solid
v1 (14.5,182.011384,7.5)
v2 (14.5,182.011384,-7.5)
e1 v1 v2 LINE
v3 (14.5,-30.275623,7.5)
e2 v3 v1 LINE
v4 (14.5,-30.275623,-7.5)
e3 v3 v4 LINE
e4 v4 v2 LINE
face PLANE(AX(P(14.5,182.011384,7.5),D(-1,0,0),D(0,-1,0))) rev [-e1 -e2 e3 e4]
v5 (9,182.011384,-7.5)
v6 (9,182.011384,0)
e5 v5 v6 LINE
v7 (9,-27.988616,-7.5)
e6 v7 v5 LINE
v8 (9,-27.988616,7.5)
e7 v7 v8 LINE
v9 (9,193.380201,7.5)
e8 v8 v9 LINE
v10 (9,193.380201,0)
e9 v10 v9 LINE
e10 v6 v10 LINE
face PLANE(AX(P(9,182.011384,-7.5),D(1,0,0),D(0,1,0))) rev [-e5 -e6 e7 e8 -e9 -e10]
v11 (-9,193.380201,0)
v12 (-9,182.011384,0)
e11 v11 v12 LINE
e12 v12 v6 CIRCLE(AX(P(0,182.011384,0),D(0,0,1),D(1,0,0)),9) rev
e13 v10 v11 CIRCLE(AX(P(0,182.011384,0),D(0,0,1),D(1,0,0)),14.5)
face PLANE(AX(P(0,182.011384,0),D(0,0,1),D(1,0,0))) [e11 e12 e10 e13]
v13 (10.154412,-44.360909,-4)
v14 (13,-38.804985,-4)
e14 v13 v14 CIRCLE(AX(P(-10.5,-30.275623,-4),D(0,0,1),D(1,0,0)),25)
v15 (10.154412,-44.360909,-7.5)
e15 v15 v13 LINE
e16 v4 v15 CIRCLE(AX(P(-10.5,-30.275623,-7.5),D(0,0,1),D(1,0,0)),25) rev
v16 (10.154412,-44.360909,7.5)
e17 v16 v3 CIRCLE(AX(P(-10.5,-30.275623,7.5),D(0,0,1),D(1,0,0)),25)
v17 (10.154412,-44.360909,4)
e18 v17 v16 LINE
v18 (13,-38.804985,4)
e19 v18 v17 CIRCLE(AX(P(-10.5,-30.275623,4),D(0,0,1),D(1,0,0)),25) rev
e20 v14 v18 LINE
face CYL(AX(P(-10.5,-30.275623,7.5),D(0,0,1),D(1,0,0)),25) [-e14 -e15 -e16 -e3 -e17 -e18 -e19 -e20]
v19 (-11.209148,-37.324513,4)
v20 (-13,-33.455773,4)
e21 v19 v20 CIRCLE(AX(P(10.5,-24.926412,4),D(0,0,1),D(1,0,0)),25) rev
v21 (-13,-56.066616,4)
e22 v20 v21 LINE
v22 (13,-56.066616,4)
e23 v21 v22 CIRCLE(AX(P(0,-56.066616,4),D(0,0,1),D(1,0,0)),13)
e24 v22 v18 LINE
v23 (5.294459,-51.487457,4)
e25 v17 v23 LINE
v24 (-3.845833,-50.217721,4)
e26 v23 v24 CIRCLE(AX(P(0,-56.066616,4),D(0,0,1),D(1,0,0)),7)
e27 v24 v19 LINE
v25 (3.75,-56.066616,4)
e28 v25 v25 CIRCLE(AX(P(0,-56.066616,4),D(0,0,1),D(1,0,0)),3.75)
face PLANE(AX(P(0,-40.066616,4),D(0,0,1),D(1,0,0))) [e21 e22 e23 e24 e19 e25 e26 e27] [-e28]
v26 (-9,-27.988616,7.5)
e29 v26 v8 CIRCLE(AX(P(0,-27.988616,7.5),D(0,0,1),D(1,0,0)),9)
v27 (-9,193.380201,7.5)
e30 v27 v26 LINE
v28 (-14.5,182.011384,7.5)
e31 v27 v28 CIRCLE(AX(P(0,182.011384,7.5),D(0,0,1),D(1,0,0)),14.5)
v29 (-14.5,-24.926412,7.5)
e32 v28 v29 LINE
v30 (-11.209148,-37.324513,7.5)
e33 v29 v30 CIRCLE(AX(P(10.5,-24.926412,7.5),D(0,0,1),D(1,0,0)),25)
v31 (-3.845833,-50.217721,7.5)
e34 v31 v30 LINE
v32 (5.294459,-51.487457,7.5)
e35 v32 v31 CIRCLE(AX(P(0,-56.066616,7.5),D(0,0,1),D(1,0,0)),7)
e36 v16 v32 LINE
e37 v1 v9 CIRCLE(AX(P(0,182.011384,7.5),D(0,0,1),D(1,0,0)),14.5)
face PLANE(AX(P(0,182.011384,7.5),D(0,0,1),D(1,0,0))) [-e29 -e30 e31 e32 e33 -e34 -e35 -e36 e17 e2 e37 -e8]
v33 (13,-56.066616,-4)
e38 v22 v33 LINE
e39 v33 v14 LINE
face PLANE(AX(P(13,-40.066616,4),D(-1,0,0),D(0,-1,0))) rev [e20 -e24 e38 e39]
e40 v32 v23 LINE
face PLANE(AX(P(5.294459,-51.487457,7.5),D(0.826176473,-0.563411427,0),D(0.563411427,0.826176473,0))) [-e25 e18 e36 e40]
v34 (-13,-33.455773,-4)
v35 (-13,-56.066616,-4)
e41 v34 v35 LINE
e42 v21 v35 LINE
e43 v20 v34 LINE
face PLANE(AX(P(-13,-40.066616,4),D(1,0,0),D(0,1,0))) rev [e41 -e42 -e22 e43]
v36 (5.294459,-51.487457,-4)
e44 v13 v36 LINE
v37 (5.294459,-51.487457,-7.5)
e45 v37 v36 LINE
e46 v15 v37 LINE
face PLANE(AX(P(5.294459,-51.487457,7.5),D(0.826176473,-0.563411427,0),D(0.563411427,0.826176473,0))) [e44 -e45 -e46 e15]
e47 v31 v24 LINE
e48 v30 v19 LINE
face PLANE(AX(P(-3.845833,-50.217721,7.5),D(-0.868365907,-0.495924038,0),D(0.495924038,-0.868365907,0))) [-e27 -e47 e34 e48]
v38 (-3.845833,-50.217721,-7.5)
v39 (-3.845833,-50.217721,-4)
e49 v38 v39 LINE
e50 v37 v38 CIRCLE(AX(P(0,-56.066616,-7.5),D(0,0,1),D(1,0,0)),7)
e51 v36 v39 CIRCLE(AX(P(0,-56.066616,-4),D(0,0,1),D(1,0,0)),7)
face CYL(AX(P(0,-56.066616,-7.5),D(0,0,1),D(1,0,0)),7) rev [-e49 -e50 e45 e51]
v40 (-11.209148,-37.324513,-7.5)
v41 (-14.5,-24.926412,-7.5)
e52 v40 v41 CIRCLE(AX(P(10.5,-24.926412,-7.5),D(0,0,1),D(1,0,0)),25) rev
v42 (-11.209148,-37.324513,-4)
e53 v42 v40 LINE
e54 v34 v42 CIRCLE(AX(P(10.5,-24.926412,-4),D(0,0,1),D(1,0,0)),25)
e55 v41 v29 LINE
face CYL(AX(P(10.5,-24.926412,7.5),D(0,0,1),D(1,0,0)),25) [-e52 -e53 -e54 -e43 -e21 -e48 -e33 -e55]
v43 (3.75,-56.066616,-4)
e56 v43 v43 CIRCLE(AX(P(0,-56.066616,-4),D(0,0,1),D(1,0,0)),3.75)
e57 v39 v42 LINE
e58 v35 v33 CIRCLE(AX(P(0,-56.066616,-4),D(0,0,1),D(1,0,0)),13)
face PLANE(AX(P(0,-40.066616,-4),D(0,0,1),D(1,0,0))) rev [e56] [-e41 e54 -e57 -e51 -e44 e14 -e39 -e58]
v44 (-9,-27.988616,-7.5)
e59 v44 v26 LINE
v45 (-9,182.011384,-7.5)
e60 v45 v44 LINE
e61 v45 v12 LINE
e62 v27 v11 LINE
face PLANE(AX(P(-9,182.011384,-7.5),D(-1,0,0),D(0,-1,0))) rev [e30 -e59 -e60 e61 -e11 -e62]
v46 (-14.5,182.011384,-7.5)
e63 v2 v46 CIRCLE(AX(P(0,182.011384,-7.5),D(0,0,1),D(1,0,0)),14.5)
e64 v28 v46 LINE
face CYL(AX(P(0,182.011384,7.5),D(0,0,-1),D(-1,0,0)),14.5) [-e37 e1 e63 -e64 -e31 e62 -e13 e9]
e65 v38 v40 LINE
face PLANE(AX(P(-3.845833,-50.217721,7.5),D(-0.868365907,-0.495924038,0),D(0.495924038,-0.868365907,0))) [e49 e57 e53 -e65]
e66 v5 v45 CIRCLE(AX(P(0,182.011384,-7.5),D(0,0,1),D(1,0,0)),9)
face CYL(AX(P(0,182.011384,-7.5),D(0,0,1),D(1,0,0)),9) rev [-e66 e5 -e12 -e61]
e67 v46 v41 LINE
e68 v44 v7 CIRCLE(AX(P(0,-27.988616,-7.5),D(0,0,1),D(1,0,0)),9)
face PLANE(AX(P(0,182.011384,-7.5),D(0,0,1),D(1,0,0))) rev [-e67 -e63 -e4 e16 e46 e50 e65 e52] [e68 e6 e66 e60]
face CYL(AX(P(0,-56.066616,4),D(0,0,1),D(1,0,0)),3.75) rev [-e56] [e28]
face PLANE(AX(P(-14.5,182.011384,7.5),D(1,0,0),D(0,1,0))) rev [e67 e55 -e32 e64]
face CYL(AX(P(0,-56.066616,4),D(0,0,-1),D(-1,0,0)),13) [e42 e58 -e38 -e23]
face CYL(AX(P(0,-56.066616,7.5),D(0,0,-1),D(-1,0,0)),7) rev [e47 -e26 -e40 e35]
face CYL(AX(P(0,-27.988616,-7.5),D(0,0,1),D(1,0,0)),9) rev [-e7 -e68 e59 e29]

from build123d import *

# Parameters (mm, degrees)
ESTRUSIONE_ESTRUSIONE1_DEPTH = 7.5
ESTRUSIONE_ESTRUSIONE2_DEPTH = 4
TAGLIO_ESTRUSIONE1_DEPTH     = 198.380910943
TAGLIO_ESTRUSIONE2_DEPTH     = 198.380910943
RACCORDO1_R                  = 25
FORO_PER_VITE_M6_5_1_D       = 7.5
TAGLIO_ESTRUSIONE3_DEPTH     = 7.5
TAGLIO_ESTRUSIONE4_DEPTH     = 7.5


with BuildPart() as part:
    # Schizzo1 → Estrusione-Estrusione1 (new, symmetric)
    with BuildSketch(Plane.XY):
        with BuildLine():
            Line((14.5, 182.011383906), (14.5, -37.988616094))
            ThreePointArc((14.5, -37.988616094), (0, -52.488616094), (-14.5, -37.988616094))
            Line((-14.5, -37.988616094), (-14.5, 182.011383906))
            ThreePointArc((-14.5, 182.011383906), (0, 196.511383906), (14.5, 182.011383906))
        make_face()
    extrude(amount=ESTRUSIONE_ESTRUSIONE1_DEPTH, both=True)

    # Schizzo2 → Estrusione-Estrusione2 (add, symmetric)
    with BuildSketch(Plane.XY):
        with BuildLine():
            Line((13, -40.066616094), (13, -56.066616094))
            ThreePointArc((13, -56.066616094), (0, -69.066616094), (-13, -56.066616094))
            Line((-13, -56.066616094), (-13, -40.066616094))
            ThreePointArc((-13, -40.066616094), (0, -27.066616094), (13, -40.066616094))
        make_face()
    extrude(amount=ESTRUSIONE_ESTRUSIONE2_DEPTH, both=True)

    # Schizzo4 → Taglio-Estrusione1 (cut, through all)
    with BuildSketch(Plane.XY.offset(4)):
        with BuildLine():
            Line((5.29445937, -51.487456784), (14.5, -37.988616094))
            Line((14.5, -37.988616094), (21.494330869, -44.738036439))
            Line((21.494330869, -44.738036439), (5.386515672, -60.537124892))
            ThreePointArc((5.386515672, -60.537124892), (0.071202698, -63.066253954), (-5.29445937, -60.645775404))
            Line((-5.29445937, -60.645775404), (-28.596127717, -39.453615031))
            Line((-28.596127717, -39.453615031), (-14.5, -31.562211214))
            Line((-14.5, -31.562211214), (-3.845832517, -50.217721134))
            ThreePointArc((-3.845832517, -50.217721134), (0.963165144, -49.133196093), (5.29445937, -51.487456784))
        make_face()
    taglio_estrusione1 = extrude(amount=TAGLIO_ESTRUSIONE1_DEPTH, mode=Mode.SUBTRACT)

    # Specchia1: Taglio-Estrusione1 across plane
    add(taglio_estrusione1.mirror(Plane.XY), mode=Mode.SUBTRACT)

    # Schizzo5 → Taglio-Estrusione2 (cut, through all)
    with BuildSketch(Plane.XY.offset(4)):
        Polygon((-13, -44.411232383), (-13, -34.188720036), (-15.056335757, -30.588064032), (-15.056335757, -43.619366988), align=None)
        Polygon((13, -44.411232383), (13, -40.188189356), (17.407959402, -33.724436261), (17.407959402, -44.411232383), align=None)
    extrude(amount=-TAGLIO_ESTRUSIONE2_DEPTH, mode=Mode.SUBTRACT)

    # Raccordo1
    # the kernel refuses this fillet: 25 mm, written as the material it takes off along each edge
    with BuildSketch(Plane(origin=(-14.5, -31.562211214, -24.089497944), x_dir=(0.4959240379913526, -0.8683659070589721, 0), z_dir=(0, 0, 1))) as raccordo1_piece_1_section:
        with BuildLine():
            CenterArc((RACCORDO1_R * 0.26543196711, RACCORDO1_R), RACCORDO1_R, 240.269299078, 29.730700922)
            Line((-RACCORDO1_R * 0.230492070882, RACCORDO1_R * 0.131634092941), (0, 0))
            Line((0, 0), (RACCORDO1_R * 0.26543196711, 0))
        make_face()
    raccordo1_piece_1 = extrude(amount=48.178995889, mode=Mode.PRIVATE)
    raccordo1_piece_1 = split(raccordo1_piece_1, bisect_by=Plane(origin=(-13, -35.788331904, -14.044748972), z_dir=(1, 0, 0)), keep=Keep.TOP, mode=Mode.PRIVATE)
    raccordo1_piece_1 = split(raccordo1_piece_1, bisect_by=Plane(origin=(-12.28179921, -35.788331904, -4), z_dir=(0, 0, -1)), keep=Keep.TOP, mode=Mode.PRIVATE)
    add(raccordo1_piece_1, mode=Mode.SUBTRACT)
    with BuildSketch(Plane(origin=(-14.5, -31.562211214, -24.089497944), x_dir=(0.4959240379913526, -0.8683659070589721, 0), z_dir=(0, 0, 1))) as raccordo1_piece_2_section:
        with BuildLine():
            CenterArc((RACCORDO1_R * 0.26543196711, RACCORDO1_R), RACCORDO1_R, 240.269299078, 29.730700922)
            Line((-RACCORDO1_R * 0.230492070882, RACCORDO1_R * 0.131634092941), (0, 0))
            Line((0, 0), (RACCORDO1_R * 0.26543196711, 0))
        make_face()
    raccordo1_piece_2 = extrude(amount=48.178995889, mode=Mode.PRIVATE)
    raccordo1_piece_2 = split(raccordo1_piece_2, bisect_by=Plane(origin=(-13, -30.370530988, -14.044748972), z_dir=(-1, 0, 0)), keep=Keep.TOP, mode=Mode.PRIVATE)
    raccordo1_piece_2 = split(raccordo1_piece_2, bisect_by=Plane(origin=(-14.266276842, -30.370530988, -4), z_dir=(0, 0, -1)), keep=Keep.TOP, mode=Mode.PRIVATE)
    add(raccordo1_piece_2, mode=Mode.SUBTRACT)
    with BuildSketch(Plane(origin=(-14.5, -31.562211214, -24.089497944), x_dir=(0.4959240379913526, -0.8683659070589721, 0), z_dir=(0, 0, 1))) as raccordo1_piece_3_section:
        with BuildLine():
            CenterArc((RACCORDO1_R * 0.26543196711, RACCORDO1_R), RACCORDO1_R, 240.269299078, 29.730700922)
            Line((-RACCORDO1_R * 0.230492070882, RACCORDO1_R * 0.131634092941), (0, 0))
            Line((0, 0), (RACCORDO1_R * 0.26543196711, 0))
        make_face()
    raccordo1_piece_3 = extrude(amount=48.178995889, mode=Mode.PRIVATE)
    raccordo1_piece_3 = split(raccordo1_piece_3, bisect_by=Plane(origin=(-14.266276842, -30.370530988, 4), z_dir=(0, 0, -1)), keep=Keep.TOP, mode=Mode.PRIVATE)
    raccordo1_piece_3 = split(raccordo1_piece_3, bisect_by=Plane(origin=(-13, -30.370530988, 0), z_dir=(-1, 0, 0)), keep=Keep.TOP, mode=Mode.PRIVATE)
    raccordo1_piece_3 = split(raccordo1_piece_3, bisect_by=Plane(origin=(-14.266276842, -30.370530988, -4), z_dir=(0, 0, 1)), keep=Keep.TOP, mode=Mode.PRIVATE)
    add(raccordo1_piece_3, mode=Mode.SUBTRACT)
    with BuildSketch(Plane(origin=(-14.5, -31.562211214, -24.089497944), x_dir=(0.4959240379913526, -0.8683659070589721, 0), z_dir=(0, 0, 1))) as raccordo1_piece_4_section:
        with BuildLine():
            CenterArc((RACCORDO1_R * 0.26543196711, RACCORDO1_R), RACCORDO1_R, 240.269299078, 29.730700922)
            Line((-RACCORDO1_R * 0.230492070882, RACCORDO1_R * 0.131634092941), (0, 0))
            Line((0, 0), (RACCORDO1_R * 0.26543196711, 0))
        make_face()
    raccordo1_piece_4 = extrude(amount=48.178995889, mode=Mode.PRIVATE)
    raccordo1_piece_4 = split(raccordo1_piece_4, bisect_by=Plane(origin=(-12.28179921, -35.788331904, 4), z_dir=(0, 0, 1)), keep=Keep.TOP, mode=Mode.PRIVATE)
    raccordo1_piece_4 = split(raccordo1_piece_4, bisect_by=Plane(origin=(-13, -35.788331904, 14.044748972), z_dir=(1, 0, 0)), keep=Keep.TOP, mode=Mode.PRIVATE)
    add(raccordo1_piece_4, mode=Mode.SUBTRACT)
    with BuildSketch(Plane(origin=(-14.5, -31.562211214, -24.089497944), x_dir=(0.4959240379913526, -0.8683659070589721, 0), z_dir=(0, 0, 1))) as raccordo1_piece_5_section:
        with BuildLine():
            CenterArc((RACCORDO1_R * 0.26543196711, RACCORDO1_R), RACCORDO1_R, 240.269299078, 29.730700922)
            Line((-RACCORDO1_R * 0.230492070882, RACCORDO1_R * 0.131634092941), (0, 0))
            Line((0, 0), (RACCORDO1_R * 0.26543196711, 0))
        make_face()
    raccordo1_piece_5 = extrude(amount=48.178995889, mode=Mode.PRIVATE)
    raccordo1_piece_5 = split(raccordo1_piece_5, bisect_by=Plane(origin=(-14.266276842, -30.370530988, 4), z_dir=(0, 0, 1)), keep=Keep.TOP, mode=Mode.PRIVATE)
    raccordo1_piece_5 = split(raccordo1_piece_5, bisect_by=Plane(origin=(-13, -30.370530988, 14.044748972), z_dir=(-1, 0, 0)), keep=Keep.TOP, mode=Mode.PRIVATE)
    add(raccordo1_piece_5, mode=Mode.SUBTRACT)
    with BuildSketch(Plane(origin=(14.5, -37.988616094, 26.782481556), x_dir=(0, 1, 0), z_dir=(0, 0, -1))) as raccordo1_piece_6_section:
        with BuildLine():
            CenterArc((RACCORDO1_R * 0.308519704891, -RACCORDO1_R), RACCORDO1_R, 90, 34.292050498)
            Line((-RACCORDO1_R * 0.254891721625, -RACCORDO1_R * 0.173823527041), (0, 0))
            Line((0, 0), (RACCORDO1_R * 0.308519704891, 0))
        make_face()
    raccordo1_piece_6 = extrude(amount=53.564963111, mode=Mode.PRIVATE)
    raccordo1_piece_6 = split(raccordo1_piece_6, bisect_by=Plane(origin=(14.242102238, -36.251699178, 4), z_dir=(0, 0, 1)), keep=Keep.TOP, mode=Mode.PRIVATE)
    raccordo1_piece_6 = split(raccordo1_piece_6, bisect_by=Plane(origin=(13, -36.251699178, 15.391240778), z_dir=(1, 0, 0)), keep=Keep.TOP, mode=Mode.PRIVATE)
    add(raccordo1_piece_6, mode=Mode.SUBTRACT)
    with BuildSketch(Plane(origin=(14.5, -37.988616094, 26.782481556), x_dir=(0, 1, 0), z_dir=(0, 0, -1))) as raccordo1_piece_7_section:
        with BuildLine():
            CenterArc((RACCORDO1_R * 0.308519704891, -RACCORDO1_R), RACCORDO1_R, 90, 34.292050498)
            Line((-RACCORDO1_R * 0.254891721625, -RACCORDO1_R * 0.173823527041), (0, 0))
            Line((0, 0), (RACCORDO1_R * 0.308519704891, 0))
        make_face()
    raccordo1_piece_7 = extrude(amount=53.564963111, mode=Mode.PRIVATE)
    raccordo1_piece_7 = split(raccordo1_piece_7, bisect_by=Plane(origin=(11.895384145, -41.966992208, 4), z_dir=(0, 0, 1)), keep=Keep.TOP, mode=Mode.PRIVATE)
    raccordo1_piece_7 = split(raccordo1_piece_7, bisect_by=Plane(origin=(13, -41.966992208, 15.391240778), z_dir=(-1, 0, 0)), keep=Keep.TOP, mode=Mode.PRIVATE)
    add(raccordo1_piece_7, mode=Mode.SUBTRACT)
    with BuildSketch(Plane(origin=(14.5, -37.988616094, 26.782481556), x_dir=(0, 1, 0), z_dir=(0, 0, -1))) as raccordo1_piece_8_section:
        with BuildLine():
            CenterArc((RACCORDO1_R * 0.308519704891, -RACCORDO1_R), RACCORDO1_R, 90, 34.292050498)
            Line((-RACCORDO1_R * 0.254891721625, -RACCORDO1_R * 0.173823527041), (0, 0))
            Line((0, 0), (RACCORDO1_R * 0.308519704891, 0))
        make_face()
    raccordo1_piece_8 = extrude(amount=53.564963111, mode=Mode.PRIVATE)
    raccordo1_piece_8 = split(raccordo1_piece_8, bisect_by=Plane(origin=(14.242102238, -36.251699178, 4), z_dir=(0, 0, -1)), keep=Keep.TOP, mode=Mode.PRIVATE)
    raccordo1_piece_8 = split(raccordo1_piece_8, bisect_by=Plane(origin=(14.242102238, -36.251699178, -4), z_dir=(0, 0, 1)), keep=Keep.TOP, mode=Mode.PRIVATE)
    raccordo1_piece_8 = split(raccordo1_piece_8, bisect_by=Plane(origin=(13, -36.251699178, 0), z_dir=(1, 0, 0)), keep=Keep.TOP, mode=Mode.PRIVATE)
    add(raccordo1_piece_8, mode=Mode.SUBTRACT)
    with BuildSketch(Plane(origin=(14.5, -37.988616094, 26.782481556), x_dir=(0, 1, 0), z_dir=(0, 0, -1))) as raccordo1_piece_9_section:
        with BuildLine():
            CenterArc((RACCORDO1_R * 0.308519704891, -RACCORDO1_R), RACCORDO1_R, 90, 34.292050498)
            Line((-RACCORDO1_R * 0.254891721625, -RACCORDO1_R * 0.173823527041), (0, 0))
            Line((0, 0), (RACCORDO1_R * 0.308519704891, 0))
        make_face()
    raccordo1_piece_9 = extrude(amount=53.564963111, mode=Mode.PRIVATE)
    raccordo1_piece_9 = split(raccordo1_piece_9, bisect_by=Plane(origin=(14.242102238, -36.251699178, -4), z_dir=(0, 0, -1)), keep=Keep.TOP, mode=Mode.PRIVATE)
    raccordo1_piece_9 = split(raccordo1_piece_9, bisect_by=Plane(origin=(13, -36.251699178, -15.391240778), z_dir=(1, 0, 0)), keep=Keep.TOP, mode=Mode.PRIVATE)
    add(raccordo1_piece_9, mode=Mode.SUBTRACT)
    with BuildSketch(Plane(origin=(14.5, -37.988616094, 26.782481556), x_dir=(0, 1, 0), z_dir=(0, 0, -1))) as raccordo1_piece_10_section:
        with BuildLine():
            CenterArc((RACCORDO1_R * 0.308519704891, -RACCORDO1_R), RACCORDO1_R, 90, 34.292050498)
            Line((-RACCORDO1_R * 0.254891721625, -RACCORDO1_R * 0.173823527041), (0, 0))
            Line((0, 0), (RACCORDO1_R * 0.308519704891, 0))
        make_face()
    raccordo1_piece_10 = extrude(amount=53.564963111, mode=Mode.PRIVATE)
    raccordo1_piece_10 = split(raccordo1_piece_10, bisect_by=Plane(origin=(11.895384145, -41.966992208, -4), z_dir=(0, 0, -1)), keep=Keep.TOP, mode=Mode.PRIVATE)
    raccordo1_piece_10 = split(raccordo1_piece_10, bisect_by=Plane(origin=(13, -41.966992208, -15.391240778), z_dir=(-1, 0, 0)), keep=Keep.TOP, mode=Mode.PRIVATE)
    add(raccordo1_piece_10, mode=Mode.SUBTRACT)

    # Foro per Vite M6.5-1 (through all)
    with Locations(Plane(origin=(0, -56.066616094, 4), x_dir=(1, 0, 0), z_dir=(0, 0, 1))):
        with Locations((0, 0)):
            Hole(FORO_PER_VITE_M6_5_1_D / 2)

    # Schizzo8 → Taglio-Estrusione3 (cut, symmetric)
    with BuildSketch(Plane.XY):
        with BuildLine():
            Line((9, 182.011383906), (9, -27.988616094))
            ThreePointArc((9, -27.988616094), (0, -36.988616094), (-9, -27.988616094))
            Line((-9, -27.988616094), (-9, 182.011383906))
            ThreePointArc((-9, 182.011383906), (0, 191.011383906), (9, 182.011383906))
        make_face()
    extrude(amount=TAGLIO_ESTRUSIONE3_DEPTH, both=True, mode=Mode.SUBTRACT)

    # Schizzo9 → Taglio-Estrusione4 (cut)
    with BuildSketch(Plane.XY.offset(7.5)):
        with BuildLine():
            Line((-9, 182.011383906), (-9, 202.011383906))
            ThreePointArc((-9, 202.011383906), (0, 211.011383906), (9, 202.011383906))
            Line((9, 202.011383906), (9, 182.011383906))
            ThreePointArc((9, 182.011383906), (0, 173.011383906), (-9, 182.011383906))
        make_face()
    extrude(amount=-TAGLIO_ESTRUSIONE4_DEPTH, mode=Mode.SUBTRACT)


solid = part.part
